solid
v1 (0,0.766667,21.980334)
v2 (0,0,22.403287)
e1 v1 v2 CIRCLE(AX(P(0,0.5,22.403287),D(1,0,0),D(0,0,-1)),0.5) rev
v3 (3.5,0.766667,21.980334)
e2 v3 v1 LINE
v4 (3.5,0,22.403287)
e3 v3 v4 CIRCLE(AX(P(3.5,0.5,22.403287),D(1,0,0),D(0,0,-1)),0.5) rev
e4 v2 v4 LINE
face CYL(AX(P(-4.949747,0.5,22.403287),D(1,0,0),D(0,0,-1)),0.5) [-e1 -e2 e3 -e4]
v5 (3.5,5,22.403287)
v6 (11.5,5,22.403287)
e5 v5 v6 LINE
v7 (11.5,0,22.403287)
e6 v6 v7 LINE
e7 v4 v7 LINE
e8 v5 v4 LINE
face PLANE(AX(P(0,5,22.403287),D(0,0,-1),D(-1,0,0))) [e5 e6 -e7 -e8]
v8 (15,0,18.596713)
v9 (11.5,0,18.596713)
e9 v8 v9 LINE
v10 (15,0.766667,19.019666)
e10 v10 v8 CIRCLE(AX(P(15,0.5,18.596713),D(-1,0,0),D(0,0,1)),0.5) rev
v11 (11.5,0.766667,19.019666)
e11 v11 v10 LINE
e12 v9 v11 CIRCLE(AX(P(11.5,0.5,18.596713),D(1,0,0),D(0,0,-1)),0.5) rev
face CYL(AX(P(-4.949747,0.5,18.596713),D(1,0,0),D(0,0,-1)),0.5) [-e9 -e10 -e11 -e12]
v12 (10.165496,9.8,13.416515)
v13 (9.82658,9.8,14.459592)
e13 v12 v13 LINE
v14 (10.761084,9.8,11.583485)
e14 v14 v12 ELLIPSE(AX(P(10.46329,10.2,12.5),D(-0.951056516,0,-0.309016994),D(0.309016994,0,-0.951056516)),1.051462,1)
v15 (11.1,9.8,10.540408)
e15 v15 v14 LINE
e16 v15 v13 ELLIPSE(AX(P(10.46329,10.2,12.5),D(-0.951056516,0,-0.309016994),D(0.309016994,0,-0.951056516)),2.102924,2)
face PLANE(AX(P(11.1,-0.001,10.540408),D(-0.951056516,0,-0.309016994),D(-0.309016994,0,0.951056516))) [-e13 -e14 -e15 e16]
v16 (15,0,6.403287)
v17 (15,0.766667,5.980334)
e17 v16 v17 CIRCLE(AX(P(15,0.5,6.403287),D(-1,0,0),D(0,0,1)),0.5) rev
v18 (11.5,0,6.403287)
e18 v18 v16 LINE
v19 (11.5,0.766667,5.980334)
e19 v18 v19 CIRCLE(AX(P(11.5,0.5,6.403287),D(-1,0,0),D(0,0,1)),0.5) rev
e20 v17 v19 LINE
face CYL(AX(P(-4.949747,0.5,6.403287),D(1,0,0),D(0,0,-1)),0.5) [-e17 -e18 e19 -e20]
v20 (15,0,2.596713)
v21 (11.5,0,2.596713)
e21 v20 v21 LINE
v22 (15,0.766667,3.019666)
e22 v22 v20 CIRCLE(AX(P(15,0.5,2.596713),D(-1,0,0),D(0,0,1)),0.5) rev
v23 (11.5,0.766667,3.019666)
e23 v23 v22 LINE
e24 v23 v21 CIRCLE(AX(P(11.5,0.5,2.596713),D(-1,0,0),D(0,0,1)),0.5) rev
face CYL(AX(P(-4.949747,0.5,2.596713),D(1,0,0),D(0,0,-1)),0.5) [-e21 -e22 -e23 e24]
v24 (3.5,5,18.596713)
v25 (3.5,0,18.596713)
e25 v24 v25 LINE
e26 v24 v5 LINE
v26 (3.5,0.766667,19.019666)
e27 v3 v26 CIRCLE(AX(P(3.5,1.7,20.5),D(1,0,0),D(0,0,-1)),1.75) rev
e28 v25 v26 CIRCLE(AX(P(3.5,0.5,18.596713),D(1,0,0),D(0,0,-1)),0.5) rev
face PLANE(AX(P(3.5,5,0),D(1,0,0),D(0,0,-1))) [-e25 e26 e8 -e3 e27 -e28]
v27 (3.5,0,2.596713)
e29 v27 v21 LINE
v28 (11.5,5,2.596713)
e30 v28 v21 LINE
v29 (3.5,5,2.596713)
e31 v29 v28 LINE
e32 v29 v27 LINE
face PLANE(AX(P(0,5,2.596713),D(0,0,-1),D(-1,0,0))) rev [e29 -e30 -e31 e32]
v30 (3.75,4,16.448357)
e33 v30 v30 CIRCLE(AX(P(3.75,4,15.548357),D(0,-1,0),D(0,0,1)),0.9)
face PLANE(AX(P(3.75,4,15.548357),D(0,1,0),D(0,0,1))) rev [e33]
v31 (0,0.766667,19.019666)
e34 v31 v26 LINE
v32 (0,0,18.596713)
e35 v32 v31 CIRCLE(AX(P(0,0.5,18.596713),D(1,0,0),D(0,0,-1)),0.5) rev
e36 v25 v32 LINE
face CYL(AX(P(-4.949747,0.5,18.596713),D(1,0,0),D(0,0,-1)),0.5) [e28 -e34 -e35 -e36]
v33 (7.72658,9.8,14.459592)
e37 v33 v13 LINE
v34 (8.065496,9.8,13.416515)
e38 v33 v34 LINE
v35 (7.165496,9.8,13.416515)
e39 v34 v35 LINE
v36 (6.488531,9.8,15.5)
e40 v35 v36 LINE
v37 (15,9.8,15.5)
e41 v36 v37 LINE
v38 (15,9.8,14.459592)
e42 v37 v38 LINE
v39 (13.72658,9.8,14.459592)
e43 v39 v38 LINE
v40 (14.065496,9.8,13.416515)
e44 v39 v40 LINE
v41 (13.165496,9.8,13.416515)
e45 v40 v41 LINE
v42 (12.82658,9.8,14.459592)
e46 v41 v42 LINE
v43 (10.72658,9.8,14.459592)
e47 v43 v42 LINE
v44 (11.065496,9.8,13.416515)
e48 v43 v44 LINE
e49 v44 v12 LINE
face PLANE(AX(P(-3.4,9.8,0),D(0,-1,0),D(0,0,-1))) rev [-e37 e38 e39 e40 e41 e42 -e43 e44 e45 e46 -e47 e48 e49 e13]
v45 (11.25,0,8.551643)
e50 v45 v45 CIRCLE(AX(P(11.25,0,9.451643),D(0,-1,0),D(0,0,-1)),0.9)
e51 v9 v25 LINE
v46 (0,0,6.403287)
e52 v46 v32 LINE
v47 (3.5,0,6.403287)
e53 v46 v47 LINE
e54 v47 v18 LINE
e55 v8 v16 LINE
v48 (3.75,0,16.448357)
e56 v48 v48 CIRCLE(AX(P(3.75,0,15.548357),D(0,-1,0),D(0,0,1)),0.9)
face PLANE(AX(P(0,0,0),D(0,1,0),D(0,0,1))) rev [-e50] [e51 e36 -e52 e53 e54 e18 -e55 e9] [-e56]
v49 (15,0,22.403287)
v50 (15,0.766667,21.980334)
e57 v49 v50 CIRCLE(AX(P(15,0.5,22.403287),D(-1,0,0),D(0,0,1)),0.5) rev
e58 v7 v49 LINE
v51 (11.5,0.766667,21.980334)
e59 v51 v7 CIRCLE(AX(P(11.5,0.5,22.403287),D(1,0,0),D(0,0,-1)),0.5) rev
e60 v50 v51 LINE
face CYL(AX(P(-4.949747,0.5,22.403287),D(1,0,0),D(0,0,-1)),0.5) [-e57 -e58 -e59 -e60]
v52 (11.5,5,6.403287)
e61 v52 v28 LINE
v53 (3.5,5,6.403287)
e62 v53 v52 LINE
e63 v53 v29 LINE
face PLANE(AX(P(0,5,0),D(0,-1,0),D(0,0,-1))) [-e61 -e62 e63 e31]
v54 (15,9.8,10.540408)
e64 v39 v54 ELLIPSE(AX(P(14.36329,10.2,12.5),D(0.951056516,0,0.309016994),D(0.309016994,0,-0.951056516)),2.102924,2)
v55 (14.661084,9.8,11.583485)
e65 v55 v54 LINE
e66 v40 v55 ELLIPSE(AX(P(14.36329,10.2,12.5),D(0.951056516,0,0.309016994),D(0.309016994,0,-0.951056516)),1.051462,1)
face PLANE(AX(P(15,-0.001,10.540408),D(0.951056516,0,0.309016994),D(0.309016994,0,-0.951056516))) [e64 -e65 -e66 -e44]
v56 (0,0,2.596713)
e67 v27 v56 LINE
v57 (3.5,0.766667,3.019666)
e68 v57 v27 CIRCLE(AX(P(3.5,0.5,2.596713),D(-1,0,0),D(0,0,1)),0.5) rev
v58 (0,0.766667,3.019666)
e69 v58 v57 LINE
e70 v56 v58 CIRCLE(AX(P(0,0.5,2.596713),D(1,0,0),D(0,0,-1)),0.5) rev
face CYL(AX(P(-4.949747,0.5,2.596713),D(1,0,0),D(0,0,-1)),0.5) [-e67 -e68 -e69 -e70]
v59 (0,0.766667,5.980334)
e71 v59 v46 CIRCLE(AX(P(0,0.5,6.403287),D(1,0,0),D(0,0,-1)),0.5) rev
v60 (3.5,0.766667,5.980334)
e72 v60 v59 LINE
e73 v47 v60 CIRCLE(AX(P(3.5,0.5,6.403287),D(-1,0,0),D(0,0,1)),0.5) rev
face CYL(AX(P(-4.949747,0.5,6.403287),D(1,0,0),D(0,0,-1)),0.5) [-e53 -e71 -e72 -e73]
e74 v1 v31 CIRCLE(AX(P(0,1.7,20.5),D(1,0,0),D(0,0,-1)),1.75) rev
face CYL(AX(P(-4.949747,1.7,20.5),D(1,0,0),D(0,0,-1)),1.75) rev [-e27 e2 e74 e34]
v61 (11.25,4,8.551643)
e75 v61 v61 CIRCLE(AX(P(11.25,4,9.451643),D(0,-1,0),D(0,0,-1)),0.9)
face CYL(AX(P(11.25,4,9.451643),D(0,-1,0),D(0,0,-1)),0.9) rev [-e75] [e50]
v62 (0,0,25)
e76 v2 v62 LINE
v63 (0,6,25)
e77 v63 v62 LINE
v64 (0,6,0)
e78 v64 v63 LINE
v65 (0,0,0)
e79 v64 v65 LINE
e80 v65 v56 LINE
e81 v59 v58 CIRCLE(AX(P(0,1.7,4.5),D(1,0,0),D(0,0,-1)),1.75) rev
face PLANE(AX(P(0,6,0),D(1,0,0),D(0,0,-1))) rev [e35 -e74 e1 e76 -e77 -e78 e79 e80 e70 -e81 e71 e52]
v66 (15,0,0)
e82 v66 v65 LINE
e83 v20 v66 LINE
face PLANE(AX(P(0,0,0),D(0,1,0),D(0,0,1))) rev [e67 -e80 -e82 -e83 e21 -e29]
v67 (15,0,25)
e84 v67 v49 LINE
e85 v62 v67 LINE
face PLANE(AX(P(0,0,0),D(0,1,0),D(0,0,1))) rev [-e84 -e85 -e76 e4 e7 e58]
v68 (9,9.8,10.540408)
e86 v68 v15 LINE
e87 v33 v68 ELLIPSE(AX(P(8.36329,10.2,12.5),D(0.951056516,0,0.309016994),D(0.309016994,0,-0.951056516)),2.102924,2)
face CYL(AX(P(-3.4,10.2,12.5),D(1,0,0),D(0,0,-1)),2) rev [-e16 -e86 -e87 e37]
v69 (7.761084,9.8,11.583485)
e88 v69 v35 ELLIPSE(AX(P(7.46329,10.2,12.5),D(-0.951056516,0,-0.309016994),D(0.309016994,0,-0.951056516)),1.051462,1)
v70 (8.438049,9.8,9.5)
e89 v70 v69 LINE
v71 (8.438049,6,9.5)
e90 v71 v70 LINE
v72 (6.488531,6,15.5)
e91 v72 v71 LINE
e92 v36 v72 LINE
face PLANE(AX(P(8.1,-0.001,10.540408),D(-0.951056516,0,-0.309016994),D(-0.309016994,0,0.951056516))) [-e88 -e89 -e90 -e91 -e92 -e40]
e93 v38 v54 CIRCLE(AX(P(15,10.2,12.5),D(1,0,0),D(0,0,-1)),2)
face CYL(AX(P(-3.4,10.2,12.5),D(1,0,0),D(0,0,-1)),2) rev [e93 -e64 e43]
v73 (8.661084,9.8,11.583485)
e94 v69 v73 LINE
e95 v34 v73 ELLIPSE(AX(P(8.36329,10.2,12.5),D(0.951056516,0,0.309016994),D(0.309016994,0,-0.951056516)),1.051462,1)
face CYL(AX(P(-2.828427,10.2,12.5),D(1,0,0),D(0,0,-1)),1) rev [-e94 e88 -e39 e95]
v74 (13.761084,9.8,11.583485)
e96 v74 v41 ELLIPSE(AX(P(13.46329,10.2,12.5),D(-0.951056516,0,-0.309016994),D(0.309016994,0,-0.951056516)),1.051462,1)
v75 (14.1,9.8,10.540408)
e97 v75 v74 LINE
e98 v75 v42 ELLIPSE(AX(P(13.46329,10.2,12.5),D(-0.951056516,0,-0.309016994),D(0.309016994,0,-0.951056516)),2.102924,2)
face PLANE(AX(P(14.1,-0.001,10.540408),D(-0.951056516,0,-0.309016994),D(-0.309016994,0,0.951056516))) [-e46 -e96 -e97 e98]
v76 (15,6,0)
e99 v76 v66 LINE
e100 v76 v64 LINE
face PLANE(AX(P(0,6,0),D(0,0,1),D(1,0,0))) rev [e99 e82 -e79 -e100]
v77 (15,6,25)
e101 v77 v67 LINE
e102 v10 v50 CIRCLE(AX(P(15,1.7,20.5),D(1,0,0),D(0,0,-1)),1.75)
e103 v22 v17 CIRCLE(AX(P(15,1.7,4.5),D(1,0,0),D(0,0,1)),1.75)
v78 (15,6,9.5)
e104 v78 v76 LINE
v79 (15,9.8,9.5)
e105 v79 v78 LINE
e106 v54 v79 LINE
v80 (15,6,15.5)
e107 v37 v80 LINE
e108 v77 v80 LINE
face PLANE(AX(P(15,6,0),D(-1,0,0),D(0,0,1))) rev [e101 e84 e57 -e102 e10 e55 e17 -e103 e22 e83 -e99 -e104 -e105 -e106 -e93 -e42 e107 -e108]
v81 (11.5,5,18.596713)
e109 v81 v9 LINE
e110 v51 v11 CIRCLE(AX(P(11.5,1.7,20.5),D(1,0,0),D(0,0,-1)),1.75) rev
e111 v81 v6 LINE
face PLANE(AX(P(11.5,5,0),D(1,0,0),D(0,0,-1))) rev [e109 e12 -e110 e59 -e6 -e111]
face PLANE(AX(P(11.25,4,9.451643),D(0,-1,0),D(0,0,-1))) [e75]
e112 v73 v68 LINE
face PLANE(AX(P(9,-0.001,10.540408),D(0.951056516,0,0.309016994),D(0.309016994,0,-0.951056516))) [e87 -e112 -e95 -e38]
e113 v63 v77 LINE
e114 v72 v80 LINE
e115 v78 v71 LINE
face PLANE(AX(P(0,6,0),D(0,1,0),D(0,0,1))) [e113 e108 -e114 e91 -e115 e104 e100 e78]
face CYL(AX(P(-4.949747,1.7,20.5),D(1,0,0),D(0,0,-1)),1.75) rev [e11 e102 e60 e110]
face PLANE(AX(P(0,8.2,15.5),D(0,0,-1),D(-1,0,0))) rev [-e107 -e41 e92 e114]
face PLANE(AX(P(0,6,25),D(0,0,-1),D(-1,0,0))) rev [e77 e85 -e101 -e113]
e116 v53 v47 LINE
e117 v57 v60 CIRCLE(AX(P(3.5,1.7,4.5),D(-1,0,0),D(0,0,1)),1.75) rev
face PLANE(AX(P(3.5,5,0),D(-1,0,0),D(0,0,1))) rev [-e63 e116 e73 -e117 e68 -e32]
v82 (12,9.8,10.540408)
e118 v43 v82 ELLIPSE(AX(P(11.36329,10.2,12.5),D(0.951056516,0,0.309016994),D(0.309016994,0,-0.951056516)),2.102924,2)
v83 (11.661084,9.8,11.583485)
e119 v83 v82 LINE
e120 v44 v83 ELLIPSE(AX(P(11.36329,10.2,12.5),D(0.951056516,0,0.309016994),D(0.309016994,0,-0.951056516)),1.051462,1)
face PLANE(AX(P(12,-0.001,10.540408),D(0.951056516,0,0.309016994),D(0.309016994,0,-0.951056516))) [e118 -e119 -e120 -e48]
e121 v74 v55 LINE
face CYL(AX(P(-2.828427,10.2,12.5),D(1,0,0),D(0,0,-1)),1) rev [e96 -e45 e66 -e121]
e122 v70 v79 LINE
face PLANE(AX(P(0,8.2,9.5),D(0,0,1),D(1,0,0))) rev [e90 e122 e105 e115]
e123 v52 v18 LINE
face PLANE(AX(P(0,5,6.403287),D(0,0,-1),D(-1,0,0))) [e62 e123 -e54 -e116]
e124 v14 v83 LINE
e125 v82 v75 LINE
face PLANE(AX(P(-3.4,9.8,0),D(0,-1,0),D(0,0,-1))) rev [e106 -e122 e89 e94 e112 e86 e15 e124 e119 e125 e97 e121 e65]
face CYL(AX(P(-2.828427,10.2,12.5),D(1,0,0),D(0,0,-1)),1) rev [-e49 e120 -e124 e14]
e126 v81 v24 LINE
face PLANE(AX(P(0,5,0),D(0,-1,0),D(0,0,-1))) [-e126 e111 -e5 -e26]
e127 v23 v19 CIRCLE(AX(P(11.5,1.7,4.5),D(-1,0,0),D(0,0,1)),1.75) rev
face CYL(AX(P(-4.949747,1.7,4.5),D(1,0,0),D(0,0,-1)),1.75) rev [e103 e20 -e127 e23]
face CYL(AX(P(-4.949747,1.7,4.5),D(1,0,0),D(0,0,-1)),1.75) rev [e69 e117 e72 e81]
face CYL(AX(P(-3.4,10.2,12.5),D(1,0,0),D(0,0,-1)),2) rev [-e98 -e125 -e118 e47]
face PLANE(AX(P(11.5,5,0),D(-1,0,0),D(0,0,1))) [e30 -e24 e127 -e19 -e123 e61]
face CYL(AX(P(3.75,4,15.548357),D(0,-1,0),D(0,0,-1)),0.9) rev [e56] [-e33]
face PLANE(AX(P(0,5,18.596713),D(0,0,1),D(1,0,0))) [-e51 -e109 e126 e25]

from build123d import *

# Parameters (mm, degrees)
SKETCH_1_W          = 15
SKETCH_1_H          = 25
EXTRUDE_1_DEPTH     = 6
SKETCH_3_R          = 1.75
CUT_EXTRUDE_1_DEPTH = 15
FILLET_1_R          = 0.5
SKETCH_4_W          = 15
SKETCH_4_H          = 6
EXTRUDE_3_DEPTH     = 2.2
EXTRUDE_4_DEPTH     = 15
EXTRUDE_5_REACH     = 32.758
CUT_EXTRUDE_2_REACH = 32.758
SKETCH_8_R          = 1
CUT_EXTRUDE_START   = 6
CUT_EXTRUDE_3_DEPTH = 3.8
SKETCH_10_W         = 8
SKETCH_10_H         = 3.806573262
CUT_EXTRUDE_5_DEPTH = 5
SKETCH_12_R         = 0.9
CUT_EXTRUDE_7_DEPTH = 4


# Read off the part's stored shape, not the designer's step: 切除-拉伸3
with BuildPart() as part:
    # 草图1 → 凸台-拉伸1 (new body)
    with BuildSketch(Plane(origin=(0, 0, 0), x_dir=(1, 0, 0), z_dir=(0, 1, 0))):
        with Locations((7.5, -12.5)):
            Rectangle(SKETCH_1_W, SKETCH_1_H)
    extrude(amount=EXTRUDE_1_DEPTH)

    # 草图3 → 切除-拉伸1 (cut)
    with BuildSketch(Plane(origin=(15, 0, 0), x_dir=(0, 0, -1), z_dir=(1, 0, 0))):
        with Locations((-20.5, 1.7)):
            Circle(SKETCH_3_R)
        with Locations((-4.5, 1.7)):
            Circle(SKETCH_3_R)
    extrude(amount=-CUT_EXTRUDE_1_DEPTH, mode=Mode.SUBTRACT)

    # 圆角1
    fillet_1_edges = [part.edges().sort_by_distance(p)[0] for p in [
        (7.5, 0, 4.084668807),
        (7.5, 0, 4.915331193),
        (7.5, 0, 20.084668807),
        (7.5, 0, 20.915331193),
    ]]
    fillet(fillet_1_edges, radius=FILLET_1_R)

    # 草图4 → 凸台-拉伸3 (add)
    with BuildSketch(Plane(origin=(0, 6, 0), x_dir=(1, 0, 0), z_dir=(0, 1, 0))):
        with Locations((7.5, -12.5)):
            Rectangle(SKETCH_4_W, SKETCH_4_H)
    extrude(amount=EXTRUDE_3_DEPTH)

    # 草图6 → 凸台-拉伸4 (add)
    with BuildSketch(Plane(origin=(15, 0, 0), x_dir=(0, 0, -1), z_dir=(1, 0, 0))):
        with BuildLine():
            ThreePointArc((-10.540408206, 9.8), (-11.235088936, 8.650806662), (-12.5, 8.2))
            Line((-12.5, 8.2), (-9.5, 8.2))
            Line((-9.5, 8.2), (-9.5, 9.8))
            Line((-9.5, 9.8), (-10.540408206, 9.8))
        make_face()
        with BuildLine():
            Line((-15.5, 9.8), (-15.5, 8.2))
            Line((-15.5, 8.2), (-12.5, 8.2))
            ThreePointArc((-12.5, 8.2), (-13.764911064, 8.650806662), (-14.459591794, 9.8))
            Line((-14.459591794, 9.8), (-15.5, 9.8))
        make_face()
    extrude(amount=-EXTRUDE_4_DEPTH)

    # 草图7 → 凸台-拉伸5 (add, up to next)
    with BuildSketch(Plane(origin=(0, 9.8, 0), x_dir=(1, 0, 0), z_dir=(0, 1, 0)), mode=Mode.PRIVATE) as extrude_5_sk1:
        Polygon((14.1, -10.540408206), (15, -10.540408206), (13.726580059, -14.459591794), (12.826580059, -14.459591794), align=None)
    extrude_5_tool1 = extrude(extrude_5_sk1.sketch, amount=-EXTRUDE_5_REACH, mode=Mode.PRIVATE) - part.part
    # 草图7 → 凸台-拉伸5 (add, up to next)
    with BuildSketch(Plane(origin=(0, 9.8, 0), x_dir=(1, 0, 0), z_dir=(0, 1, 0)), mode=Mode.PRIVATE) as extrude_5_sk2:
        Polygon((11.1, -10.540408206), (12, -10.540408206), (10.726580059, -14.459591794), (9.826580059, -14.459591794), align=None)
    extrude_5_tool2 = extrude(extrude_5_sk2.sketch, amount=-EXTRUDE_5_REACH, mode=Mode.PRIVATE) - part.part
    # 草图7 → 凸台-拉伸5 (add, up to next)
    with BuildSketch(Plane(origin=(0, 9.8, 0), x_dir=(1, 0, 0), z_dir=(0, 1, 0)), mode=Mode.PRIVATE) as extrude_5_sk3:
        Polygon((8.1, -10.540408206), (9, -10.540408206), (7.726580059, -14.459591794), (6.826580059, -14.459591794), align=None)
    extrude_5_tool3 = extrude(extrude_5_sk3.sketch, amount=-EXTRUDE_5_REACH, mode=Mode.PRIVATE) - part.part
    # 草图7 → 凸台-拉伸5 (add, up to next)
    with BuildSketch(Plane(origin=(0, 9.8, 0), x_dir=(1, 0, 0), z_dir=(0, 1, 0)), mode=Mode.PRIVATE) as extrude_5_sk4:
        Polygon((5.1, -10.540408206), (6, -10.540408206), (4.726580059, -14.459591794), (3.826580059, -14.459591794), align=None)
    extrude_5_tool4 = extrude(extrude_5_sk4.sketch, amount=-EXTRUDE_5_REACH, mode=Mode.PRIVATE) - part.part
    # 草图7 → 凸台-拉伸5 (add, up to next)
    with BuildSketch(Plane(origin=(0, 9.8, 0), x_dir=(1, 0, 0), z_dir=(0, 1, 0)), mode=Mode.PRIVATE) as extrude_5_sk5:
        Polygon((2.1, -10.540408206), (3, -10.540408206), (1.726580059, -14.459591794), (0.826580059, -14.459591794), align=None)
    extrude_5_tool5 = extrude(extrude_5_sk5.sketch, amount=-EXTRUDE_5_REACH, mode=Mode.PRIVATE) - part.part
    add(extrude_5_tool1.solids().sort_by_distance((13.91329, 9.8, 12.5))[0])
    add(extrude_5_tool2.solids().sort_by_distance((10.91329, 9.8, 12.5))[0])
    add(extrude_5_tool3.solids().sort_by_distance((7.91329, 9.8, 12.5))[0])
    add(extrude_5_tool4.solids().sort_by_distance((4.91329, 9.8, 12.5))[0])
    add(extrude_5_tool5.solids().sort_by_distance((1.91329, 9.8, 12.5))[0])

    # 切除-拉伸2: up to this face of the body (flat: up to its plane)
    cut_extrude_2_end = Plane(part.part.faces().sort_by_distance((0, 3.752278375, 12.5))[0])
    # 草图8 → 切除-拉伸2 (cut, up to the picked face)
    with BuildSketch(Plane(origin=(15, 0, 0), x_dir=(0, 0, -1), z_dir=(1, 0, 0)), mode=Mode.PRIVATE) as cut_extrude_2_sk1:
        with Locations((-12.5, 10.2)):
            Circle(SKETCH_8_R)
    cut_extrude_2_tool1 = split(extrude(cut_extrude_2_sk1.sketch, amount=-CUT_EXTRUDE_2_REACH, mode=Mode.PRIVATE), bisect_by=cut_extrude_2_end, keep=Keep.BOTH, mode=Mode.PRIVATE)
    add(cut_extrude_2_tool1.solids().sort_by(Axis((15, 10.2, 12.5), (-1, 0, 0)))[0], mode=Mode.SUBTRACT)

    # 切除-拉伸3 outline → 切除-拉伸3 (cut)
    with BuildSketch(Plane(origin=(0, 0, 0), x_dir=(1, 0, 0), z_dir=(0, 1, 0)).offset(CUT_EXTRUDE_START)):
        Polygon((6.488530941, -15.5), (8.438049118, -9.5), (0, -9.5), (0, -15.5), align=None)
    extrude(amount=CUT_EXTRUDE_3_DEPTH, mode=Mode.SUBTRACT)

    # 草图10 → 切除-拉伸5 (cut)
    with BuildSketch(Plane.XZ):
        with Locations((7.5, 20.5)):
            Rectangle(SKETCH_10_W, SKETCH_10_H)
        with Locations((7.5, 4.5)):
            Rectangle(SKETCH_10_W, SKETCH_10_H)
    extrude(amount=-CUT_EXTRUDE_5_DEPTH, mode=Mode.SUBTRACT)

    # 草图12 → 切除-拉伸7 (cut)
    with BuildSketch(Plane.XZ):
        with Locations(Location((11.25, 9.451643316, 0), (0, 0, 270))):
            Circle(SKETCH_12_R)
        with Locations(Location((3.75, 15.548356684, 0), (0, 0, 90))):
            Circle(SKETCH_12_R)
    extrude(amount=-CUT_EXTRUDE_7_DEPTH, mode=Mode.SUBTRACT)


solid = part.part
